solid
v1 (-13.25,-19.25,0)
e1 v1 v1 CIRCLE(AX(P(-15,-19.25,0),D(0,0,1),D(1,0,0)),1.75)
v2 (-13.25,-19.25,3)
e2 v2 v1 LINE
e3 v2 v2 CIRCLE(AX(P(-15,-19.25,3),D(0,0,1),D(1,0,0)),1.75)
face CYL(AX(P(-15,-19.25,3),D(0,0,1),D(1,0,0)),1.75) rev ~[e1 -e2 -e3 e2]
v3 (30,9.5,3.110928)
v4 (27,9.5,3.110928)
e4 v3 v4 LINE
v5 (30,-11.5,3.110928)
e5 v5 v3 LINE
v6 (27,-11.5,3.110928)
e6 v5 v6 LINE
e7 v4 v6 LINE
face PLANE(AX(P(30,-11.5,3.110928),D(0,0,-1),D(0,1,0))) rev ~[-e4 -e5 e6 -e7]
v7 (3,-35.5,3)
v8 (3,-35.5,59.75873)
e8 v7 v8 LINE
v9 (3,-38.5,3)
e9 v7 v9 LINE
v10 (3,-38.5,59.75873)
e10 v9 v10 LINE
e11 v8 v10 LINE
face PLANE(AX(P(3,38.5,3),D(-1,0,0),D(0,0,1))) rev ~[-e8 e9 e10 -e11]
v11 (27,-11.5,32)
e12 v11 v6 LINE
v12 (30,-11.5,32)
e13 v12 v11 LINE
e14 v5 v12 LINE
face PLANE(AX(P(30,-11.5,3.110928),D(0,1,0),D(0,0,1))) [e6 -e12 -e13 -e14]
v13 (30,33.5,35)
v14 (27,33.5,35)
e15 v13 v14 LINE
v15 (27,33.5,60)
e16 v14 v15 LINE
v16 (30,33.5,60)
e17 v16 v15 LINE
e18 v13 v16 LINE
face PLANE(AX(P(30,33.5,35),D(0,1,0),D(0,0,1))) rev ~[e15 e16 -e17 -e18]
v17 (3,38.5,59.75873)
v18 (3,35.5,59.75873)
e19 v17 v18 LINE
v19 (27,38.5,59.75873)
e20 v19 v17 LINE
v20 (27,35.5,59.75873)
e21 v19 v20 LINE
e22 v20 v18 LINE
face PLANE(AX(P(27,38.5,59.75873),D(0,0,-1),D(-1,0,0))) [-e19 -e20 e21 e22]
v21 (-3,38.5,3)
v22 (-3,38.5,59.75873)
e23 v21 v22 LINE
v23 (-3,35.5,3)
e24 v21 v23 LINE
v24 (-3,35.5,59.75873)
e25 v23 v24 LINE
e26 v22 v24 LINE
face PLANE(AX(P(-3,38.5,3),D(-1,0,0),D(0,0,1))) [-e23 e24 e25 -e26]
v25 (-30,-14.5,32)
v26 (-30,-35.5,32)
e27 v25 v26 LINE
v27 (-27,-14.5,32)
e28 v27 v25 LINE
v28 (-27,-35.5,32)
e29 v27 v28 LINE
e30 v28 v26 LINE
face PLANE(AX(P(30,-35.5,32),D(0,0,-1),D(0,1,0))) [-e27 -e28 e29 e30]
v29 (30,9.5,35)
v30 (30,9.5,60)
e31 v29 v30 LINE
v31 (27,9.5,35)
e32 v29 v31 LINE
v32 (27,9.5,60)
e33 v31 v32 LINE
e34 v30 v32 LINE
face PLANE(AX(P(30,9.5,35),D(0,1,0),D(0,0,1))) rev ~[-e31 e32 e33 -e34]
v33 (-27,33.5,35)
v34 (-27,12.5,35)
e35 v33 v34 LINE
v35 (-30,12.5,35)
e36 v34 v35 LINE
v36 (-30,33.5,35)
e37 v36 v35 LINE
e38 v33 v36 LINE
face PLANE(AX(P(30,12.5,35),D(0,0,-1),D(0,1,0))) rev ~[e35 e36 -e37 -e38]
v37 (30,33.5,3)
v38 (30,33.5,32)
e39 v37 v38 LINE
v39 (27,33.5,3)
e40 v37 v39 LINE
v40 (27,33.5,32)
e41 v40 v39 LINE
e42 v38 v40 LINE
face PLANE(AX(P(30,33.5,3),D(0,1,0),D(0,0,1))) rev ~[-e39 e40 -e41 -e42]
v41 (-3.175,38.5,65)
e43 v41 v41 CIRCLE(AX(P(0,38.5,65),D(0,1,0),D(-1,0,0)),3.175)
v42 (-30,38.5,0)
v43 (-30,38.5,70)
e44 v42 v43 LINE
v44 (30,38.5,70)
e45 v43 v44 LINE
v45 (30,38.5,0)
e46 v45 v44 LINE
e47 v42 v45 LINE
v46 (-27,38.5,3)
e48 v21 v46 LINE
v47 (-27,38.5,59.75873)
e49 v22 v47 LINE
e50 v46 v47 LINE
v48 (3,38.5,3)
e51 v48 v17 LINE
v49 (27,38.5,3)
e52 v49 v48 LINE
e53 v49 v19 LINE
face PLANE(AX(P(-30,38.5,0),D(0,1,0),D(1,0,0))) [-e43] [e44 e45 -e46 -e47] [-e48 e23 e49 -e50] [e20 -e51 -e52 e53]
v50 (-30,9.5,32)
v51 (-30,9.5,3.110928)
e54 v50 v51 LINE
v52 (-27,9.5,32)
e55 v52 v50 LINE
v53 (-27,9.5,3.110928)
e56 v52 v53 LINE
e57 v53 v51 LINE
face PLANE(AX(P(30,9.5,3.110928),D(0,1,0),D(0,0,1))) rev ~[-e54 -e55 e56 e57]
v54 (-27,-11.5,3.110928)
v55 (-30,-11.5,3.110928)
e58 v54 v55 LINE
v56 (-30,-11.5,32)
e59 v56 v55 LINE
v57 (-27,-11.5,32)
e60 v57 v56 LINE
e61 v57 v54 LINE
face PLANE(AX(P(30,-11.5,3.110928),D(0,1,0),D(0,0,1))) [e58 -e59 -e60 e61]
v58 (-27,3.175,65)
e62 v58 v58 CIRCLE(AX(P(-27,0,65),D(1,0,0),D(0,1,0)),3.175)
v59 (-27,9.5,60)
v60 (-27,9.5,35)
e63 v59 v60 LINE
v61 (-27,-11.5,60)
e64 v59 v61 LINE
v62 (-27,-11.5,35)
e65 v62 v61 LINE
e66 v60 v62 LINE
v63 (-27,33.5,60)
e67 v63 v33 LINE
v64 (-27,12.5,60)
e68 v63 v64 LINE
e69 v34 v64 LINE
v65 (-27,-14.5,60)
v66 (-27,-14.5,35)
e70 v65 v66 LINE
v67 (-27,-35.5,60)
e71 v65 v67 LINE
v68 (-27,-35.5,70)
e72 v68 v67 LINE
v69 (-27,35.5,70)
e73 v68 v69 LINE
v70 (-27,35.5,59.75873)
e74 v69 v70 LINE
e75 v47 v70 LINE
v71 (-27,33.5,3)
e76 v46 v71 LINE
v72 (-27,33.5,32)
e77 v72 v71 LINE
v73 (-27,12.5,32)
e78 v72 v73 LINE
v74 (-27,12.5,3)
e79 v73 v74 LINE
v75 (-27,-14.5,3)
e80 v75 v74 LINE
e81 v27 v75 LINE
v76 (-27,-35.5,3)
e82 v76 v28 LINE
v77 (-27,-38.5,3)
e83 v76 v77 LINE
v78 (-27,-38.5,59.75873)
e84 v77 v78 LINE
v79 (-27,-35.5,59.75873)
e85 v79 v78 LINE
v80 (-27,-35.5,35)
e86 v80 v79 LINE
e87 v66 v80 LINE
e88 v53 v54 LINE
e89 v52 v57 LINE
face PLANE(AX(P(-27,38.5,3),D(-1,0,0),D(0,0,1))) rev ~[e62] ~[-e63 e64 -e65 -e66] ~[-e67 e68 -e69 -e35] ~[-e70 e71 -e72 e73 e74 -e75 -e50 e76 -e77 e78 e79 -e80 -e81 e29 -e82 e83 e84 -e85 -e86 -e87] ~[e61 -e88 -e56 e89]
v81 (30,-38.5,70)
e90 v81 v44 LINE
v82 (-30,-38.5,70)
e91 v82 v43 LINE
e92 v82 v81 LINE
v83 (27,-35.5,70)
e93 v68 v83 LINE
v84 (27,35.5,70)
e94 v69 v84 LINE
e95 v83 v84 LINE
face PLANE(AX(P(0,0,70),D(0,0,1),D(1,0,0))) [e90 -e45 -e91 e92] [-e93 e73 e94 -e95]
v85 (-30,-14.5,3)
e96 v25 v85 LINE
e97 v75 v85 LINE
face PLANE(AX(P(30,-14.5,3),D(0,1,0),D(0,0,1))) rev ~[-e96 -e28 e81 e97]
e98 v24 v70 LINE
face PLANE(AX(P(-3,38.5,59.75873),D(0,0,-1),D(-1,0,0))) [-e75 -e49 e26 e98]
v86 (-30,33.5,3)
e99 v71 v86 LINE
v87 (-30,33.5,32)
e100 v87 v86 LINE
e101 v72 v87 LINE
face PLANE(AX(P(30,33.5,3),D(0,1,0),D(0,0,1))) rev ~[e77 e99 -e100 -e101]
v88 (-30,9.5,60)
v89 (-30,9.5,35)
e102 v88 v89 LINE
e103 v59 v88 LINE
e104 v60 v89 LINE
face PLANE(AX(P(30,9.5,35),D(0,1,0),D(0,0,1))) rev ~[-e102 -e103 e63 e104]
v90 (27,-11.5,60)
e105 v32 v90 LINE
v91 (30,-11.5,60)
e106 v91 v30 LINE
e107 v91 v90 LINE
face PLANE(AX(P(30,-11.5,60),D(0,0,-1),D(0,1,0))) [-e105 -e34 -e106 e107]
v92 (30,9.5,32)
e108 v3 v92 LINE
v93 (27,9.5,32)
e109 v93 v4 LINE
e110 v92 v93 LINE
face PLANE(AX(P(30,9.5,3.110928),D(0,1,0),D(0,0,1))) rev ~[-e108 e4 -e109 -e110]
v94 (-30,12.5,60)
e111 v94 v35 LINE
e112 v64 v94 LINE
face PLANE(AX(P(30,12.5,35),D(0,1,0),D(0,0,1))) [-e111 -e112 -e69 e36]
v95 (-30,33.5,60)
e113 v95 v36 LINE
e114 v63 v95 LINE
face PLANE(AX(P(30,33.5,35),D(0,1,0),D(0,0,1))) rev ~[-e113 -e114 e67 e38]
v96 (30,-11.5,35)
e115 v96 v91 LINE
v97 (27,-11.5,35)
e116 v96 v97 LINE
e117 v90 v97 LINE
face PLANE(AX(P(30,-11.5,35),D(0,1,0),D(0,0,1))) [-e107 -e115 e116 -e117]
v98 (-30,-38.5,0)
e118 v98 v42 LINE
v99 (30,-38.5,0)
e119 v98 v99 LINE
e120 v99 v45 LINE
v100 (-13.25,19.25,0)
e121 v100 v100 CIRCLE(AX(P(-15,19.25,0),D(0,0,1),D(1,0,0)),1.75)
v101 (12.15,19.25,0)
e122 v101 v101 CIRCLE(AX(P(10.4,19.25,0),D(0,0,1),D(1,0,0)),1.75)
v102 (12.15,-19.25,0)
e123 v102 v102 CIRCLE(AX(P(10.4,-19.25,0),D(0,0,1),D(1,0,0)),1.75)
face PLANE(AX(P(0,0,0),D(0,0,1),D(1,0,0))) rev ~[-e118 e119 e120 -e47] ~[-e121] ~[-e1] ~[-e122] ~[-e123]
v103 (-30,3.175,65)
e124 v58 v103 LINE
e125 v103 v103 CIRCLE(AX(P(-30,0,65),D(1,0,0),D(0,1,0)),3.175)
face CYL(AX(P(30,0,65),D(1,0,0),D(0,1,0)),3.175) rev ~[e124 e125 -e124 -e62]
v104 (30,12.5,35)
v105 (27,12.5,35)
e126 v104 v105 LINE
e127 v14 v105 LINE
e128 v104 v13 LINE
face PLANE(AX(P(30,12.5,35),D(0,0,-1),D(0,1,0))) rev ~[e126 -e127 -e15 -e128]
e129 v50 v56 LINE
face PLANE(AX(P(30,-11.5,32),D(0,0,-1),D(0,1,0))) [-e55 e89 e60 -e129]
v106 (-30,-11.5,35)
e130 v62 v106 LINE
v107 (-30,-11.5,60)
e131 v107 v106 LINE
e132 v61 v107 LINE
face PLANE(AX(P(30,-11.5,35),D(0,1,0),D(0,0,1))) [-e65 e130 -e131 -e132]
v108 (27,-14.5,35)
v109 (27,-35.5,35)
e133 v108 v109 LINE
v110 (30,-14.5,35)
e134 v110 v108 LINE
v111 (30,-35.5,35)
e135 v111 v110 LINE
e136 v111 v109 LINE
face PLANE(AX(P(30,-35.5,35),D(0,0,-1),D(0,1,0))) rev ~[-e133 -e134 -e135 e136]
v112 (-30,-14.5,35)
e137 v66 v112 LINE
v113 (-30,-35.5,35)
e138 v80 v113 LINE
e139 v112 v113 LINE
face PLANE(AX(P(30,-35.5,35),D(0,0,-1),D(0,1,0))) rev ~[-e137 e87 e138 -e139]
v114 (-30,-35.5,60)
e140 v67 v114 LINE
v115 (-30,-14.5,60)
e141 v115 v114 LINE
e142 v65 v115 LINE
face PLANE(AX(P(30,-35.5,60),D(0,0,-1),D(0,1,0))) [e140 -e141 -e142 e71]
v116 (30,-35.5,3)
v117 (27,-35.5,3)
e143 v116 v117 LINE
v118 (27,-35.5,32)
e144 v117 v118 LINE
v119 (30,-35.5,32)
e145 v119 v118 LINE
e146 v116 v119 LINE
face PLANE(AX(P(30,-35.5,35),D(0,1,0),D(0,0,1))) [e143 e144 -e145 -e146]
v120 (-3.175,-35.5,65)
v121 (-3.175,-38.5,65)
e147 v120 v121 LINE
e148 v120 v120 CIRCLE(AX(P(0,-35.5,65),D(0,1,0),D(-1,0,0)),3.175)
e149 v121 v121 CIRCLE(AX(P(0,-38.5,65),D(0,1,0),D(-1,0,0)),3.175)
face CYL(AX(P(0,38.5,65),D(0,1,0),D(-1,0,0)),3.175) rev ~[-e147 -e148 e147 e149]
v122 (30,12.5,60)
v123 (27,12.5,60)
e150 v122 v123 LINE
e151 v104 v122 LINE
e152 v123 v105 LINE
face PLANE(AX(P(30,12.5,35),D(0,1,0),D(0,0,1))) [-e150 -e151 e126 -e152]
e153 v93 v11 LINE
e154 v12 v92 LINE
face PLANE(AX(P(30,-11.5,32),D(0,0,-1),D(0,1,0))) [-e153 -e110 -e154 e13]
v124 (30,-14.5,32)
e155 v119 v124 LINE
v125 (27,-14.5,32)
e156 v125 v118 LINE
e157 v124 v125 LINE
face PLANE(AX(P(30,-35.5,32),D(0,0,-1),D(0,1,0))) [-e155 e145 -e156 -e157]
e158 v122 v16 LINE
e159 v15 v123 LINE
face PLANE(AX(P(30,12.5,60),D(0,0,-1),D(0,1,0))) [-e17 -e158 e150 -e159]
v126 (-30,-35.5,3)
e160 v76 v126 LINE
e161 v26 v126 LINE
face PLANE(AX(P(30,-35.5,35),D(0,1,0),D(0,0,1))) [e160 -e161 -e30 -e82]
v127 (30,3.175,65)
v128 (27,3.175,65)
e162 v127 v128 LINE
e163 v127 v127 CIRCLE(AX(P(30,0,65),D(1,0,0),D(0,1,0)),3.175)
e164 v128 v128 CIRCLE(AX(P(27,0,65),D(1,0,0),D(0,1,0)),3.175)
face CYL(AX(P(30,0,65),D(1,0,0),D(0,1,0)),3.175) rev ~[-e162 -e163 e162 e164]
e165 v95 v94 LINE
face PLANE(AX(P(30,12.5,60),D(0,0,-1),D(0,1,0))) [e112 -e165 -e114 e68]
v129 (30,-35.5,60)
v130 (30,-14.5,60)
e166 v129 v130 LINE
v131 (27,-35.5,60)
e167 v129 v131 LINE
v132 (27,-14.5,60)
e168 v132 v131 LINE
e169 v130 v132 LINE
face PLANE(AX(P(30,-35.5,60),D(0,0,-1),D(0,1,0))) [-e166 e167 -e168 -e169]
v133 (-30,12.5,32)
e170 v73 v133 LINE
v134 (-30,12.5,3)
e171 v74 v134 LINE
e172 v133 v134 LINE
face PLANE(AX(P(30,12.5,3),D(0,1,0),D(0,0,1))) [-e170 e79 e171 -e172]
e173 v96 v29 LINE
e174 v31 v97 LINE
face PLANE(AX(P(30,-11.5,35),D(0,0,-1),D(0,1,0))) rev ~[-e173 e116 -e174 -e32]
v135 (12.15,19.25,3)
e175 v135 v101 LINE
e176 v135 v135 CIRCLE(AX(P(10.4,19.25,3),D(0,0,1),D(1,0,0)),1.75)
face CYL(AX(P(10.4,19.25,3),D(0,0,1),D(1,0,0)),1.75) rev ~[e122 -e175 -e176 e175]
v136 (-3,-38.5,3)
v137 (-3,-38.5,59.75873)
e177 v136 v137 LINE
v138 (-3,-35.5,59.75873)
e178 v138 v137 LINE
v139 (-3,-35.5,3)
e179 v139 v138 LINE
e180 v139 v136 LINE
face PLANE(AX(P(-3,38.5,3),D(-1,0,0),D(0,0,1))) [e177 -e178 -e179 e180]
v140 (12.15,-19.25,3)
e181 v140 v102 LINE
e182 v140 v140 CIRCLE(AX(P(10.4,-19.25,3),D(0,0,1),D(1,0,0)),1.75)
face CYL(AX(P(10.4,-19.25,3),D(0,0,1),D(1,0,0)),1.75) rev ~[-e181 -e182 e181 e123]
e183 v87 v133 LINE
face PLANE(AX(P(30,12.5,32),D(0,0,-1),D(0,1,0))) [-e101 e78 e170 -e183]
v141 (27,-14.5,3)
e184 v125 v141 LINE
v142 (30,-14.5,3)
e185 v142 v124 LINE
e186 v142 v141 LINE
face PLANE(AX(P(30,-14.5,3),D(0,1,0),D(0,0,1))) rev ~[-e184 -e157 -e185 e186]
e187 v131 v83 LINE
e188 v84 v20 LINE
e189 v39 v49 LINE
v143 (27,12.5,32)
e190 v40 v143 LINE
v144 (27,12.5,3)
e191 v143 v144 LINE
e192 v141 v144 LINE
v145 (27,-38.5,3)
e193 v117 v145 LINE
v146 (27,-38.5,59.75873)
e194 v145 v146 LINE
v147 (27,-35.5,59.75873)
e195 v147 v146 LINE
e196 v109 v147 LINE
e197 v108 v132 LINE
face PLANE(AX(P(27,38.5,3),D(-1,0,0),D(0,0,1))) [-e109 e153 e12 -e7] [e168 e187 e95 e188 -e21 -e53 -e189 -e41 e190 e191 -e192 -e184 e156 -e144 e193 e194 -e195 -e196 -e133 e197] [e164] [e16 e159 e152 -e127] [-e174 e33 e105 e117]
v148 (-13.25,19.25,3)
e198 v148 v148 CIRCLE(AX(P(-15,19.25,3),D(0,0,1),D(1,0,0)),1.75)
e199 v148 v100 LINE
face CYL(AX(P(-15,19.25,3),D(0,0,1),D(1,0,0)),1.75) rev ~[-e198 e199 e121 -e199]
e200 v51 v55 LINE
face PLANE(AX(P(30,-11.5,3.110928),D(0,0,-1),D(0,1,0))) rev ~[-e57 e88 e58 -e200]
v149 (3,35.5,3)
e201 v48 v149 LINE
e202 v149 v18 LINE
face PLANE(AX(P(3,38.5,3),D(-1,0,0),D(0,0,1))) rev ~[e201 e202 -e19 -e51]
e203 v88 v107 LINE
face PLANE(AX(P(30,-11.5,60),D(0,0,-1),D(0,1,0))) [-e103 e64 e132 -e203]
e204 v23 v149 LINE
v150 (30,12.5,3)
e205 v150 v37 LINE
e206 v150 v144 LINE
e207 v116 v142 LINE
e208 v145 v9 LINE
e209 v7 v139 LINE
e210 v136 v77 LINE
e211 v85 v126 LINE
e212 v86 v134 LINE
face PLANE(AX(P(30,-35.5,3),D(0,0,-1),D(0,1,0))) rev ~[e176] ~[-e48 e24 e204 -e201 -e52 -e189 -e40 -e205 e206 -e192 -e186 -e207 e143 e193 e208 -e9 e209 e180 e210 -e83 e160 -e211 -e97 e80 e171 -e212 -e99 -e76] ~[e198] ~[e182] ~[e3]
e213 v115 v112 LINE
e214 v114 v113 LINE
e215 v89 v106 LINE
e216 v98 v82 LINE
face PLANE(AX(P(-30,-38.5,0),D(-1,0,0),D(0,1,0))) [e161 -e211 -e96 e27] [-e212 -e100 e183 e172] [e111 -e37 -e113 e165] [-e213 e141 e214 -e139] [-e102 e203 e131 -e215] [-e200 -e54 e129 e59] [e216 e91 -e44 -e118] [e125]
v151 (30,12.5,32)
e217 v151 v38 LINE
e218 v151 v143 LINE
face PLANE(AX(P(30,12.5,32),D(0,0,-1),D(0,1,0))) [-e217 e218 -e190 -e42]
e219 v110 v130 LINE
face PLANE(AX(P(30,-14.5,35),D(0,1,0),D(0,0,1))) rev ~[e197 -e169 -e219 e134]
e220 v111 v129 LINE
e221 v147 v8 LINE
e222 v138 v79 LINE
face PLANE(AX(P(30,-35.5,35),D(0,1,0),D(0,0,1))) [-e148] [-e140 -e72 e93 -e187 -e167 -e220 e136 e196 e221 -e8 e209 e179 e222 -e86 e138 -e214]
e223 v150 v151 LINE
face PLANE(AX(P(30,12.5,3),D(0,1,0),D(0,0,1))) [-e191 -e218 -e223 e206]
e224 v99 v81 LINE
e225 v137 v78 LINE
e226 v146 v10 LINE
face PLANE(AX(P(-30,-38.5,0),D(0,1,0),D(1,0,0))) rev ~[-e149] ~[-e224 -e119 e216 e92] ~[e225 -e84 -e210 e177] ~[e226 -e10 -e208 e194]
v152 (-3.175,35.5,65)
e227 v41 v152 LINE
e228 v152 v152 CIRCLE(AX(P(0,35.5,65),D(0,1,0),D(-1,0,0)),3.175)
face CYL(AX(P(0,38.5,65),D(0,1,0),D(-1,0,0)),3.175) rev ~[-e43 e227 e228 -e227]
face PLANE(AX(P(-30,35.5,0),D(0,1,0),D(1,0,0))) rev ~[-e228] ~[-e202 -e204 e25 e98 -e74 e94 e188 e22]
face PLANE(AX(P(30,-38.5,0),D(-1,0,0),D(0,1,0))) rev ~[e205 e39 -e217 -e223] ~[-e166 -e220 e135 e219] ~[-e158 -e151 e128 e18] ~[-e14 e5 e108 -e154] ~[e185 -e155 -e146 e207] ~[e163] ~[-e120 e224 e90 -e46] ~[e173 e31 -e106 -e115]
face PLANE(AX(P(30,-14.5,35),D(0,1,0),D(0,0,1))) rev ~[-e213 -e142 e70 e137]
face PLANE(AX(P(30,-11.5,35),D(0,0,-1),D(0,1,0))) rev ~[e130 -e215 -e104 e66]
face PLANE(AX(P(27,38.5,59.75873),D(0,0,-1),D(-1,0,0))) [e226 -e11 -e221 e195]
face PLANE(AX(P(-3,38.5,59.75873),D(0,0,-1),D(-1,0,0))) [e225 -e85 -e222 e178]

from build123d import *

# Parameters (mm, degrees)
F0_W      = 60
F0_H      = 77
F1_DEPTH  = 70
F2_T      = -3
F3_W      = 21
F3_H      = 25
F3_H_2    = 29
F3_H_3    = 28.8890717719
F4_DEPTH  = 60.001
F5_R      = 1.75
F6_DEPTH  = 3.001
F3_R      = 3.175
F7_DEPTH  = 60.001
F8_R      = 3.175
F8_W      = 24
F8_H      = 56.7587303836
F9_DEPTH  = 77.001
F10_DEPTH = 77.001


# Not quite as in the source:
# - a feature names something its author has since deleted; it is built from what else it names


with BuildPart() as f1:
    # F0 (on Top) → F1 (new body)
    with BuildSketch(Plane.XY):
        Rectangle(F0_W, F0_H)
    extrude(amount=F1_DEPTH)

    # F2
    f2_openings = [f1.faces().sort_by_distance(p)[0] for p in [
        (0, 0, 70),
    ]]
    offset(amount=F2_T, openings=f2_openings)

    # F3 (on face) → F4 (cut, through all)
    with BuildSketch(Plane.YZ.offset(30)):
        with Locations((-25, 47.5)):
            Rectangle(F3_W, F3_H)
        with Locations((-1, 47.5)):
            Rectangle(F3_W, F3_H)
        with Locations((23, 47.5)):
            Rectangle(F3_W, F3_H)
        with Locations((-25, 17.5)):
            Rectangle(F3_W, F3_H_2)
        with Locations((-1, 17.5554641141)):
            Rectangle(F3_W, F3_H_3)
        with Locations((23, 17.5)):
            Rectangle(F3_W, F3_H_2)
    extrude(amount=-F4_DEPTH, mode=Mode.SUBTRACT)

    # F5 (on face) → F6 (cut, through all)
    with BuildSketch(Plane.XY.offset(3)):
        with Locations((-15, -19.25)):
            Circle(F5_R)
        with Locations((10.4, -19.25)):
            Circle(F5_R)
        with Locations((-15, 19.25)):
            Circle(F5_R)
        with Locations((10.4, 19.25)):
            Circle(F5_R)
    extrude(amount=-F6_DEPTH, mode=Mode.SUBTRACT)

    # F3 (on face) → F7 (cut, through all)
    with BuildSketch(Plane.YZ.offset(30)):
        with Locations((0, 65)):
            Circle(F3_R)
    extrude(amount=-F7_DEPTH, mode=Mode.SUBTRACT)

    # F8 (on face) → F9 (cut, through all)
    with BuildSketch(Plane(origin=(0, 38.5, 0), x_dir=(-1, 0, 0), z_dir=(0, 1, 0))):
        with Locations((0, 65)):
            Circle(F8_R)
        with Locations((-15, 31.3793651918)):
            Rectangle(F8_W, F8_H)
        with Locations((15, 31.3793651918)):
            Rectangle(F8_W, F8_H)
    extrude(amount=-F9_DEPTH, mode=Mode.SUBTRACT)

    # F8 (on face) → F10 (cut, through all)
    with BuildSketch(Plane(origin=(0, 38.5, 0), x_dir=(-1, 0, 0), z_dir=(0, 1, 0))):
        with Locations((0, 65)):
            Circle(F8_R)
        with Locations((-15, 31.3793651918)):
            Rectangle(F8_W, F8_H)
        with Locations((15, 31.3793651918)):
            Rectangle(F8_W, F8_H)
    extrude(amount=-F10_DEPTH, mode=Mode.SUBTRACT)


solid = f1.part
